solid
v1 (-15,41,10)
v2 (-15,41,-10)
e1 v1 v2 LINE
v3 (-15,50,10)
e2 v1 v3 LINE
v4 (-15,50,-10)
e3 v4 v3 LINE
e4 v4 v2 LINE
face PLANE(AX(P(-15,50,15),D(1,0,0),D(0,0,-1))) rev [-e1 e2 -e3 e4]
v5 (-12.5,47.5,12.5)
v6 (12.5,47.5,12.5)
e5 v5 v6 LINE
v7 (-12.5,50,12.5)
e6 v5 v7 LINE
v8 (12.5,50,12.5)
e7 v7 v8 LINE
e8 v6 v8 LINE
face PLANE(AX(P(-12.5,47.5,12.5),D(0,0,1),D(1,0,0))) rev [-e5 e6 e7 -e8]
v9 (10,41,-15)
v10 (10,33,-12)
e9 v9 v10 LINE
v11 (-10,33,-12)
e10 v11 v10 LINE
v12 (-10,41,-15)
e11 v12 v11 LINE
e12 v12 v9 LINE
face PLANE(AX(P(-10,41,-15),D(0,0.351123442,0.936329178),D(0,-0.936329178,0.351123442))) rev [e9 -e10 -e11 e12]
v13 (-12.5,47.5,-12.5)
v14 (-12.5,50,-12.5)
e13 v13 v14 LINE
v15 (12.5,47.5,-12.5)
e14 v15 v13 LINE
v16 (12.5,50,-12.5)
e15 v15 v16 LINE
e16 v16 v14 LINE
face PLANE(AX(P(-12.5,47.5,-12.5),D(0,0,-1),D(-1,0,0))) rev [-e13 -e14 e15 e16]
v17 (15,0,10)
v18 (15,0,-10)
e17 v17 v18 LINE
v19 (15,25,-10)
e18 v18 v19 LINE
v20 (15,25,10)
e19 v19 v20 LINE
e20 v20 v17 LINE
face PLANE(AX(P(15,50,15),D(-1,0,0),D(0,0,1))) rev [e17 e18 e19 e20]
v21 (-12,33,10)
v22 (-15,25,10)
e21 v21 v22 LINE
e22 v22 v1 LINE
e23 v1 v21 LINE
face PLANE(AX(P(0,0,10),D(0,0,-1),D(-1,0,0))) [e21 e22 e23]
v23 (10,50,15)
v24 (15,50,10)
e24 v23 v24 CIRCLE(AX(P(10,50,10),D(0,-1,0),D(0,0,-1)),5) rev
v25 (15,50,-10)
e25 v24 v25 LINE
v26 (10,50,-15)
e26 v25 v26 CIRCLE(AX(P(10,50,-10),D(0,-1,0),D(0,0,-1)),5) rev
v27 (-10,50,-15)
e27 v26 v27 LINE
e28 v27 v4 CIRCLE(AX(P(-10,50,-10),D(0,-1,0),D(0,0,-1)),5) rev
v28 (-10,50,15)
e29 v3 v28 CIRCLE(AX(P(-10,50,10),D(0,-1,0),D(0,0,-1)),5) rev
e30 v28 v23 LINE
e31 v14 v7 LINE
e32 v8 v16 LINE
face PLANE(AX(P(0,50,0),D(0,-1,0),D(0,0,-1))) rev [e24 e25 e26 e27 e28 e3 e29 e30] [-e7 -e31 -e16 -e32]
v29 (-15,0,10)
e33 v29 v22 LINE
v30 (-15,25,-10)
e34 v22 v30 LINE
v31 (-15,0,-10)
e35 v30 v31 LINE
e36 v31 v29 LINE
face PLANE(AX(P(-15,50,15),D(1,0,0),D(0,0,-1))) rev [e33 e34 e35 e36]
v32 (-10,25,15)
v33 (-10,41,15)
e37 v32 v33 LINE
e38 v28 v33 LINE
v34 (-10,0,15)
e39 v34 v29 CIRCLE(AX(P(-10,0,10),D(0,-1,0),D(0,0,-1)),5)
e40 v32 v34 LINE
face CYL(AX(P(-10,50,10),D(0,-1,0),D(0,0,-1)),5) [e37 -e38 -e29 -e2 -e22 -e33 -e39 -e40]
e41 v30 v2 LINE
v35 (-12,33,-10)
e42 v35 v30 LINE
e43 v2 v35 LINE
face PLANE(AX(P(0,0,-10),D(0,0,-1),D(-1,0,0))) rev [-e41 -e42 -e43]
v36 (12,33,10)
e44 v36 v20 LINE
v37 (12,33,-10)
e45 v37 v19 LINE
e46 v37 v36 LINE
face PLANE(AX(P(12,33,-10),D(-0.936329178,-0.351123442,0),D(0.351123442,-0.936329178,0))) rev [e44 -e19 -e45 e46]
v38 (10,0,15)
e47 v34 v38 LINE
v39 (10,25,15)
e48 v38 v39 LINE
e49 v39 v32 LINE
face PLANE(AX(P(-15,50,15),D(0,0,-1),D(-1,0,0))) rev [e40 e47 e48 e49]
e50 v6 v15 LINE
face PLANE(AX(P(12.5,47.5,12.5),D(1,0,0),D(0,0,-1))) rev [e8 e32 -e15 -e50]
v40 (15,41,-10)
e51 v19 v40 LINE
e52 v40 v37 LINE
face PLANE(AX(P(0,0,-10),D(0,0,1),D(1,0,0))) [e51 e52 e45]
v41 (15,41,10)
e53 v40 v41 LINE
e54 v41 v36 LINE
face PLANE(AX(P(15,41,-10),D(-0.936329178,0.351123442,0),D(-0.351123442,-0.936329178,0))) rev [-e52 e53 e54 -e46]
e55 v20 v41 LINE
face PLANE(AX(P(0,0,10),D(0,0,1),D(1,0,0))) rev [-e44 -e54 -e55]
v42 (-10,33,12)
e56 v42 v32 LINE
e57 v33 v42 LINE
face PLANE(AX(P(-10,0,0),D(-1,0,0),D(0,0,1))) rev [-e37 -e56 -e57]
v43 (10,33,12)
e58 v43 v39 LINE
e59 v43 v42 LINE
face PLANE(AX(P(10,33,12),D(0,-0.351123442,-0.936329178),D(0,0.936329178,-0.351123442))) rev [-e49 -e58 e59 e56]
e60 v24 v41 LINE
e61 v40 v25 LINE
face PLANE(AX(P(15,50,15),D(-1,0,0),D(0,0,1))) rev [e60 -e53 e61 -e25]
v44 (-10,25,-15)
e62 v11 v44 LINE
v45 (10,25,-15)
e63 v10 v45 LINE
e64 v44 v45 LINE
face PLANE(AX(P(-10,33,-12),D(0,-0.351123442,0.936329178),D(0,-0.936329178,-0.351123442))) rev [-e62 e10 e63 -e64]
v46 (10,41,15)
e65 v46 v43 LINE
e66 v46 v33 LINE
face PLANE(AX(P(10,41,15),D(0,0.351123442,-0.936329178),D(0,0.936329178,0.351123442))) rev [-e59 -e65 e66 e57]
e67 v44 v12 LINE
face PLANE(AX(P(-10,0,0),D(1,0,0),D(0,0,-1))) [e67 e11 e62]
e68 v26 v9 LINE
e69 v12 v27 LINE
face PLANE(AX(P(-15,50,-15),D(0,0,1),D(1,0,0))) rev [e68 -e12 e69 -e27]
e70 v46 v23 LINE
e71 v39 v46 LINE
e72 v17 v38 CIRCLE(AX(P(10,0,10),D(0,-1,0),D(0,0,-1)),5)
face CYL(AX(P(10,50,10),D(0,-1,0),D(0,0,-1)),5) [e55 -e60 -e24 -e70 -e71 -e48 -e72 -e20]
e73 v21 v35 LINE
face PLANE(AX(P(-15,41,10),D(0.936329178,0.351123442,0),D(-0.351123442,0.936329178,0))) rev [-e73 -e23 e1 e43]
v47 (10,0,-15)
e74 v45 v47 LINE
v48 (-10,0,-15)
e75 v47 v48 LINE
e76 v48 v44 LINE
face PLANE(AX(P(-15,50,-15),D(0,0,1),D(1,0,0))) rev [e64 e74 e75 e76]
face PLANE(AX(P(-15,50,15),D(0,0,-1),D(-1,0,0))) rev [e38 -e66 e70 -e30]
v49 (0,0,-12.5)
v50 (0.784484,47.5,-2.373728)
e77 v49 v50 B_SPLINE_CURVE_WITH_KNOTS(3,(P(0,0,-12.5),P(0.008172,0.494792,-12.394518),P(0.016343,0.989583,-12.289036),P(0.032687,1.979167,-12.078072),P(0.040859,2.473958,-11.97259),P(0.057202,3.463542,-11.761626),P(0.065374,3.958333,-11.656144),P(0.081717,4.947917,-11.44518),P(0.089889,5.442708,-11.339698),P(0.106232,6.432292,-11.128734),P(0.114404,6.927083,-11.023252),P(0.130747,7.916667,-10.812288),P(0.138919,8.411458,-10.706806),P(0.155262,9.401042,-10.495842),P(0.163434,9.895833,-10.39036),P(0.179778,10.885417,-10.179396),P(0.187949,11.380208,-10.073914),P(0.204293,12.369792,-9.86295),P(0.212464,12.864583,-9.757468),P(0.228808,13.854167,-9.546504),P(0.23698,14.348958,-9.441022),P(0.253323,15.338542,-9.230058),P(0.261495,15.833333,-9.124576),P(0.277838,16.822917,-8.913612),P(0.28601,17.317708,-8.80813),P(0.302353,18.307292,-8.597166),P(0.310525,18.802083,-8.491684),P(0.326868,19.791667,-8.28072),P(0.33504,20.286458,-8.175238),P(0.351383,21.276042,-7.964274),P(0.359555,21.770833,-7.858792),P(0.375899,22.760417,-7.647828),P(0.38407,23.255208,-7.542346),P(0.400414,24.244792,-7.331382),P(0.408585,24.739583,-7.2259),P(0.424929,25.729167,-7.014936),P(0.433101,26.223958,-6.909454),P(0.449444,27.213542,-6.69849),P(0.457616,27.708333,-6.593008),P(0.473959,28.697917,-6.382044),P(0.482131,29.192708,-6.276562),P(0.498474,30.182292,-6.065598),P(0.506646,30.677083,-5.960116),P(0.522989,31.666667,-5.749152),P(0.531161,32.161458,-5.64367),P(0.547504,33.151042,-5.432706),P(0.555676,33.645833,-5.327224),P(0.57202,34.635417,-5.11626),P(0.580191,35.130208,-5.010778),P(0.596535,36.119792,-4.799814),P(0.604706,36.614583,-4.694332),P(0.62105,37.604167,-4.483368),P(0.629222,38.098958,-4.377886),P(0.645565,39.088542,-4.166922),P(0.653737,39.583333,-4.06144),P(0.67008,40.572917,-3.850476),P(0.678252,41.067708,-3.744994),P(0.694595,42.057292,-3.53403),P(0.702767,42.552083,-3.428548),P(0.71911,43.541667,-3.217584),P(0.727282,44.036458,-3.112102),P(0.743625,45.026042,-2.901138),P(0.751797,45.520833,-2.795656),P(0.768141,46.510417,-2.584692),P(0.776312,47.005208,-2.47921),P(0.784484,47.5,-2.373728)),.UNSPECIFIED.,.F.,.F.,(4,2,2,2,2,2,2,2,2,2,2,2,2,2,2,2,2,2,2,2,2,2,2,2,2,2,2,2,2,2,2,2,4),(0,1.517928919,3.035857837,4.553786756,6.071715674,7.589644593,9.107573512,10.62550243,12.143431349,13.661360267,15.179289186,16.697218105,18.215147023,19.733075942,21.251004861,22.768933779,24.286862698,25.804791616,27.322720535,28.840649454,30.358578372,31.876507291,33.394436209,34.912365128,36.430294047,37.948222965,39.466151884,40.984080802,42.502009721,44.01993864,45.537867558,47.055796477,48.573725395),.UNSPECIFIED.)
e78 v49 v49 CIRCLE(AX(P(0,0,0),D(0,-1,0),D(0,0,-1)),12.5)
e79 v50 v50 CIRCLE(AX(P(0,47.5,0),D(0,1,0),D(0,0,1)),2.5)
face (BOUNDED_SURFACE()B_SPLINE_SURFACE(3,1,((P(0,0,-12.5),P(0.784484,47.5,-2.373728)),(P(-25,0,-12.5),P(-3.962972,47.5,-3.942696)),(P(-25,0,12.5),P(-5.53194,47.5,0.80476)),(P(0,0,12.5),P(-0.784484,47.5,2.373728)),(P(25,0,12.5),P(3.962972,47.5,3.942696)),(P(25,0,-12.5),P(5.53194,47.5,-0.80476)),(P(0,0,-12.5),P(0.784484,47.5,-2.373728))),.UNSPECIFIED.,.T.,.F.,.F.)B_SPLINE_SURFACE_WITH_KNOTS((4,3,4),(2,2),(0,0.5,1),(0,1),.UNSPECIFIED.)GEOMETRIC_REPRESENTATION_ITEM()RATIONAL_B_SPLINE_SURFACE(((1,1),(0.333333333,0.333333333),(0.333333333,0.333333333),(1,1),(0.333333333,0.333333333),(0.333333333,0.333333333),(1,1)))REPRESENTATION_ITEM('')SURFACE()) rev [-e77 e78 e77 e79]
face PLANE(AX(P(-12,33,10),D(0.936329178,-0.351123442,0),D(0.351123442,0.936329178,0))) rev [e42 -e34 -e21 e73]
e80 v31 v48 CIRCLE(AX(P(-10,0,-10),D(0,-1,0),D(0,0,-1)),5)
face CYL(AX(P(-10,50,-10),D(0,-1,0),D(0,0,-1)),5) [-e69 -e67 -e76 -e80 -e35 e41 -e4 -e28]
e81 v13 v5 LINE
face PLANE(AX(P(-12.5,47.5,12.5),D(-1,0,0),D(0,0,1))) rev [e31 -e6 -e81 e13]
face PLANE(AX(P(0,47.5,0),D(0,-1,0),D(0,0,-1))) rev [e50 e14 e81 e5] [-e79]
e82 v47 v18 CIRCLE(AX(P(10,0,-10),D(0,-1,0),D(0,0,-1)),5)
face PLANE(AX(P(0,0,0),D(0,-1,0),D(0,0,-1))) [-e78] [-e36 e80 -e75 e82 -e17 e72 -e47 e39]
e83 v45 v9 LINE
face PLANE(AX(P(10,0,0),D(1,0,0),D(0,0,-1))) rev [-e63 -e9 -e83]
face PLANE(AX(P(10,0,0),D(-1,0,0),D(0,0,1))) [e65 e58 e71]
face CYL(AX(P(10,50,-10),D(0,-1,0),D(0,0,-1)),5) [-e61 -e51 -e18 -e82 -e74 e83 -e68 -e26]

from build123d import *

# Parameters (mm, degrees)
SKETCH2_W           = 30
SKETCH2_H           = 30
BOSS_EXTRUDE1_DEPTH = 50
SKETCH3_W           = 25
SKETCH3_H           = 25
CUT_EXTRUDE1_DEPTH  = 2.5
FILLET1_R           = 5
CIRPATTERN1_COUNT   = 4


with BuildPart() as part:
    # Sketch2 → Boss-Extrude1 (new body)
    with BuildSketch(Plane(origin=(0, 0, 0), x_dir=(1, 0, 0), z_dir=(0, 1, 0))):
        Rectangle(SKETCH2_W, SKETCH2_H)
    extrude(amount=BOSS_EXTRUDE1_DEPTH)

    # Sketch3 → Cut-Extrude1 (cut)
    with BuildSketch(Plane(origin=(0, 50, 0), x_dir=(1, 0, 0), z_dir=(0, 1, 0))):
        Rectangle(SKETCH3_W, SKETCH3_H)
    extrude(amount=-CUT_EXTRUDE1_DEPTH, mode=Mode.SUBTRACT)

    # Fillet1
    fillet1_edges = [part.edges().sort_by_distance(p)[0] for p in [
        (15, 25, 15),
        (-15, 25, 15),
        (-15, 25, -15),
        (15, 25, -15),
    ]]
    fillet(fillet1_edges, radius=FILLET1_R)

    # Cut-Loft2: read off the stored shape, not the designer's step
    # Cut-Loft2: loft between two sections, ruled curve by curve
    cut_loft2_from = [
        Edge.make_bspline([(0, 0, -12.5), (-25, 0, -12.5), (-25, 0, 12.5), (0, 0, 12.5), (25, 0, 12.5), (25, 0, -12.5), (0, 0, -12.5)], [0, 0, 0, 0, 0.5, 0.5, 0.5, 1, 1, 1, 1], 3, [1, 0.333333333, 0.333333333, 1, 0.333333333, 0.333333333, 1]),
    ]
    cut_loft2_to = [
        Edge.make_bspline([(0.784484005, 47.5, -2.373728048), (-3.962972092, 47.5, -3.942696057), (-5.531940101, 47.5, 0.804760039), (-0.784484005, 47.5, 2.373728048), (3.962972092, 47.5, 3.942696057), (5.531940101, 47.5, -0.804760039), (0.784484005, 47.5, -2.373728048)], [0, 0, 0, 0, 0.5, 0.5, 0.5, 1, 1, 1, 1], 3, [1, 0.333333333, 0.333333333, 1, 0.333333333, 0.333333333, 1]),
    ]
    cut_loft2 = Solid(Shell([*[Face.make_surface_from_curves(cut_loft2_from[k], cut_loft2_to[k]) for k in range(1)], Face(Wire(cut_loft2_from)), Face(Wire(cut_loft2_to))]))
    add(cut_loft2, mode=Mode.SUBTRACT)

    # Cut-Sweep1: sweep along a curve in space
    with BuildLine() as cut_sweep1_path:
        Line((-10, 50, 15), (10, 50, 15))
    # Sketch9 → Cut-Sweep1 (sweep, cut)
    with BuildSketch(Plane.ZY):
        Polygon((15, 41), (12, 33), (15, 25), align=None)
    cut_sweep1 = sweep(path=cut_sweep1_path.line, mode=Mode.SUBTRACT)

    # CirPattern1: Cut-Sweep1 ×4 about axis
    cirpattern1_axis = Axis((0, 0, 0), (0, 1, 0))
    for i in range(1, CIRPATTERN1_COUNT):
        add(cut_sweep1.rotate(cirpattern1_axis, i * 360 / CIRPATTERN1_COUNT), mode=Mode.SUBTRACT)


solid = part.part
